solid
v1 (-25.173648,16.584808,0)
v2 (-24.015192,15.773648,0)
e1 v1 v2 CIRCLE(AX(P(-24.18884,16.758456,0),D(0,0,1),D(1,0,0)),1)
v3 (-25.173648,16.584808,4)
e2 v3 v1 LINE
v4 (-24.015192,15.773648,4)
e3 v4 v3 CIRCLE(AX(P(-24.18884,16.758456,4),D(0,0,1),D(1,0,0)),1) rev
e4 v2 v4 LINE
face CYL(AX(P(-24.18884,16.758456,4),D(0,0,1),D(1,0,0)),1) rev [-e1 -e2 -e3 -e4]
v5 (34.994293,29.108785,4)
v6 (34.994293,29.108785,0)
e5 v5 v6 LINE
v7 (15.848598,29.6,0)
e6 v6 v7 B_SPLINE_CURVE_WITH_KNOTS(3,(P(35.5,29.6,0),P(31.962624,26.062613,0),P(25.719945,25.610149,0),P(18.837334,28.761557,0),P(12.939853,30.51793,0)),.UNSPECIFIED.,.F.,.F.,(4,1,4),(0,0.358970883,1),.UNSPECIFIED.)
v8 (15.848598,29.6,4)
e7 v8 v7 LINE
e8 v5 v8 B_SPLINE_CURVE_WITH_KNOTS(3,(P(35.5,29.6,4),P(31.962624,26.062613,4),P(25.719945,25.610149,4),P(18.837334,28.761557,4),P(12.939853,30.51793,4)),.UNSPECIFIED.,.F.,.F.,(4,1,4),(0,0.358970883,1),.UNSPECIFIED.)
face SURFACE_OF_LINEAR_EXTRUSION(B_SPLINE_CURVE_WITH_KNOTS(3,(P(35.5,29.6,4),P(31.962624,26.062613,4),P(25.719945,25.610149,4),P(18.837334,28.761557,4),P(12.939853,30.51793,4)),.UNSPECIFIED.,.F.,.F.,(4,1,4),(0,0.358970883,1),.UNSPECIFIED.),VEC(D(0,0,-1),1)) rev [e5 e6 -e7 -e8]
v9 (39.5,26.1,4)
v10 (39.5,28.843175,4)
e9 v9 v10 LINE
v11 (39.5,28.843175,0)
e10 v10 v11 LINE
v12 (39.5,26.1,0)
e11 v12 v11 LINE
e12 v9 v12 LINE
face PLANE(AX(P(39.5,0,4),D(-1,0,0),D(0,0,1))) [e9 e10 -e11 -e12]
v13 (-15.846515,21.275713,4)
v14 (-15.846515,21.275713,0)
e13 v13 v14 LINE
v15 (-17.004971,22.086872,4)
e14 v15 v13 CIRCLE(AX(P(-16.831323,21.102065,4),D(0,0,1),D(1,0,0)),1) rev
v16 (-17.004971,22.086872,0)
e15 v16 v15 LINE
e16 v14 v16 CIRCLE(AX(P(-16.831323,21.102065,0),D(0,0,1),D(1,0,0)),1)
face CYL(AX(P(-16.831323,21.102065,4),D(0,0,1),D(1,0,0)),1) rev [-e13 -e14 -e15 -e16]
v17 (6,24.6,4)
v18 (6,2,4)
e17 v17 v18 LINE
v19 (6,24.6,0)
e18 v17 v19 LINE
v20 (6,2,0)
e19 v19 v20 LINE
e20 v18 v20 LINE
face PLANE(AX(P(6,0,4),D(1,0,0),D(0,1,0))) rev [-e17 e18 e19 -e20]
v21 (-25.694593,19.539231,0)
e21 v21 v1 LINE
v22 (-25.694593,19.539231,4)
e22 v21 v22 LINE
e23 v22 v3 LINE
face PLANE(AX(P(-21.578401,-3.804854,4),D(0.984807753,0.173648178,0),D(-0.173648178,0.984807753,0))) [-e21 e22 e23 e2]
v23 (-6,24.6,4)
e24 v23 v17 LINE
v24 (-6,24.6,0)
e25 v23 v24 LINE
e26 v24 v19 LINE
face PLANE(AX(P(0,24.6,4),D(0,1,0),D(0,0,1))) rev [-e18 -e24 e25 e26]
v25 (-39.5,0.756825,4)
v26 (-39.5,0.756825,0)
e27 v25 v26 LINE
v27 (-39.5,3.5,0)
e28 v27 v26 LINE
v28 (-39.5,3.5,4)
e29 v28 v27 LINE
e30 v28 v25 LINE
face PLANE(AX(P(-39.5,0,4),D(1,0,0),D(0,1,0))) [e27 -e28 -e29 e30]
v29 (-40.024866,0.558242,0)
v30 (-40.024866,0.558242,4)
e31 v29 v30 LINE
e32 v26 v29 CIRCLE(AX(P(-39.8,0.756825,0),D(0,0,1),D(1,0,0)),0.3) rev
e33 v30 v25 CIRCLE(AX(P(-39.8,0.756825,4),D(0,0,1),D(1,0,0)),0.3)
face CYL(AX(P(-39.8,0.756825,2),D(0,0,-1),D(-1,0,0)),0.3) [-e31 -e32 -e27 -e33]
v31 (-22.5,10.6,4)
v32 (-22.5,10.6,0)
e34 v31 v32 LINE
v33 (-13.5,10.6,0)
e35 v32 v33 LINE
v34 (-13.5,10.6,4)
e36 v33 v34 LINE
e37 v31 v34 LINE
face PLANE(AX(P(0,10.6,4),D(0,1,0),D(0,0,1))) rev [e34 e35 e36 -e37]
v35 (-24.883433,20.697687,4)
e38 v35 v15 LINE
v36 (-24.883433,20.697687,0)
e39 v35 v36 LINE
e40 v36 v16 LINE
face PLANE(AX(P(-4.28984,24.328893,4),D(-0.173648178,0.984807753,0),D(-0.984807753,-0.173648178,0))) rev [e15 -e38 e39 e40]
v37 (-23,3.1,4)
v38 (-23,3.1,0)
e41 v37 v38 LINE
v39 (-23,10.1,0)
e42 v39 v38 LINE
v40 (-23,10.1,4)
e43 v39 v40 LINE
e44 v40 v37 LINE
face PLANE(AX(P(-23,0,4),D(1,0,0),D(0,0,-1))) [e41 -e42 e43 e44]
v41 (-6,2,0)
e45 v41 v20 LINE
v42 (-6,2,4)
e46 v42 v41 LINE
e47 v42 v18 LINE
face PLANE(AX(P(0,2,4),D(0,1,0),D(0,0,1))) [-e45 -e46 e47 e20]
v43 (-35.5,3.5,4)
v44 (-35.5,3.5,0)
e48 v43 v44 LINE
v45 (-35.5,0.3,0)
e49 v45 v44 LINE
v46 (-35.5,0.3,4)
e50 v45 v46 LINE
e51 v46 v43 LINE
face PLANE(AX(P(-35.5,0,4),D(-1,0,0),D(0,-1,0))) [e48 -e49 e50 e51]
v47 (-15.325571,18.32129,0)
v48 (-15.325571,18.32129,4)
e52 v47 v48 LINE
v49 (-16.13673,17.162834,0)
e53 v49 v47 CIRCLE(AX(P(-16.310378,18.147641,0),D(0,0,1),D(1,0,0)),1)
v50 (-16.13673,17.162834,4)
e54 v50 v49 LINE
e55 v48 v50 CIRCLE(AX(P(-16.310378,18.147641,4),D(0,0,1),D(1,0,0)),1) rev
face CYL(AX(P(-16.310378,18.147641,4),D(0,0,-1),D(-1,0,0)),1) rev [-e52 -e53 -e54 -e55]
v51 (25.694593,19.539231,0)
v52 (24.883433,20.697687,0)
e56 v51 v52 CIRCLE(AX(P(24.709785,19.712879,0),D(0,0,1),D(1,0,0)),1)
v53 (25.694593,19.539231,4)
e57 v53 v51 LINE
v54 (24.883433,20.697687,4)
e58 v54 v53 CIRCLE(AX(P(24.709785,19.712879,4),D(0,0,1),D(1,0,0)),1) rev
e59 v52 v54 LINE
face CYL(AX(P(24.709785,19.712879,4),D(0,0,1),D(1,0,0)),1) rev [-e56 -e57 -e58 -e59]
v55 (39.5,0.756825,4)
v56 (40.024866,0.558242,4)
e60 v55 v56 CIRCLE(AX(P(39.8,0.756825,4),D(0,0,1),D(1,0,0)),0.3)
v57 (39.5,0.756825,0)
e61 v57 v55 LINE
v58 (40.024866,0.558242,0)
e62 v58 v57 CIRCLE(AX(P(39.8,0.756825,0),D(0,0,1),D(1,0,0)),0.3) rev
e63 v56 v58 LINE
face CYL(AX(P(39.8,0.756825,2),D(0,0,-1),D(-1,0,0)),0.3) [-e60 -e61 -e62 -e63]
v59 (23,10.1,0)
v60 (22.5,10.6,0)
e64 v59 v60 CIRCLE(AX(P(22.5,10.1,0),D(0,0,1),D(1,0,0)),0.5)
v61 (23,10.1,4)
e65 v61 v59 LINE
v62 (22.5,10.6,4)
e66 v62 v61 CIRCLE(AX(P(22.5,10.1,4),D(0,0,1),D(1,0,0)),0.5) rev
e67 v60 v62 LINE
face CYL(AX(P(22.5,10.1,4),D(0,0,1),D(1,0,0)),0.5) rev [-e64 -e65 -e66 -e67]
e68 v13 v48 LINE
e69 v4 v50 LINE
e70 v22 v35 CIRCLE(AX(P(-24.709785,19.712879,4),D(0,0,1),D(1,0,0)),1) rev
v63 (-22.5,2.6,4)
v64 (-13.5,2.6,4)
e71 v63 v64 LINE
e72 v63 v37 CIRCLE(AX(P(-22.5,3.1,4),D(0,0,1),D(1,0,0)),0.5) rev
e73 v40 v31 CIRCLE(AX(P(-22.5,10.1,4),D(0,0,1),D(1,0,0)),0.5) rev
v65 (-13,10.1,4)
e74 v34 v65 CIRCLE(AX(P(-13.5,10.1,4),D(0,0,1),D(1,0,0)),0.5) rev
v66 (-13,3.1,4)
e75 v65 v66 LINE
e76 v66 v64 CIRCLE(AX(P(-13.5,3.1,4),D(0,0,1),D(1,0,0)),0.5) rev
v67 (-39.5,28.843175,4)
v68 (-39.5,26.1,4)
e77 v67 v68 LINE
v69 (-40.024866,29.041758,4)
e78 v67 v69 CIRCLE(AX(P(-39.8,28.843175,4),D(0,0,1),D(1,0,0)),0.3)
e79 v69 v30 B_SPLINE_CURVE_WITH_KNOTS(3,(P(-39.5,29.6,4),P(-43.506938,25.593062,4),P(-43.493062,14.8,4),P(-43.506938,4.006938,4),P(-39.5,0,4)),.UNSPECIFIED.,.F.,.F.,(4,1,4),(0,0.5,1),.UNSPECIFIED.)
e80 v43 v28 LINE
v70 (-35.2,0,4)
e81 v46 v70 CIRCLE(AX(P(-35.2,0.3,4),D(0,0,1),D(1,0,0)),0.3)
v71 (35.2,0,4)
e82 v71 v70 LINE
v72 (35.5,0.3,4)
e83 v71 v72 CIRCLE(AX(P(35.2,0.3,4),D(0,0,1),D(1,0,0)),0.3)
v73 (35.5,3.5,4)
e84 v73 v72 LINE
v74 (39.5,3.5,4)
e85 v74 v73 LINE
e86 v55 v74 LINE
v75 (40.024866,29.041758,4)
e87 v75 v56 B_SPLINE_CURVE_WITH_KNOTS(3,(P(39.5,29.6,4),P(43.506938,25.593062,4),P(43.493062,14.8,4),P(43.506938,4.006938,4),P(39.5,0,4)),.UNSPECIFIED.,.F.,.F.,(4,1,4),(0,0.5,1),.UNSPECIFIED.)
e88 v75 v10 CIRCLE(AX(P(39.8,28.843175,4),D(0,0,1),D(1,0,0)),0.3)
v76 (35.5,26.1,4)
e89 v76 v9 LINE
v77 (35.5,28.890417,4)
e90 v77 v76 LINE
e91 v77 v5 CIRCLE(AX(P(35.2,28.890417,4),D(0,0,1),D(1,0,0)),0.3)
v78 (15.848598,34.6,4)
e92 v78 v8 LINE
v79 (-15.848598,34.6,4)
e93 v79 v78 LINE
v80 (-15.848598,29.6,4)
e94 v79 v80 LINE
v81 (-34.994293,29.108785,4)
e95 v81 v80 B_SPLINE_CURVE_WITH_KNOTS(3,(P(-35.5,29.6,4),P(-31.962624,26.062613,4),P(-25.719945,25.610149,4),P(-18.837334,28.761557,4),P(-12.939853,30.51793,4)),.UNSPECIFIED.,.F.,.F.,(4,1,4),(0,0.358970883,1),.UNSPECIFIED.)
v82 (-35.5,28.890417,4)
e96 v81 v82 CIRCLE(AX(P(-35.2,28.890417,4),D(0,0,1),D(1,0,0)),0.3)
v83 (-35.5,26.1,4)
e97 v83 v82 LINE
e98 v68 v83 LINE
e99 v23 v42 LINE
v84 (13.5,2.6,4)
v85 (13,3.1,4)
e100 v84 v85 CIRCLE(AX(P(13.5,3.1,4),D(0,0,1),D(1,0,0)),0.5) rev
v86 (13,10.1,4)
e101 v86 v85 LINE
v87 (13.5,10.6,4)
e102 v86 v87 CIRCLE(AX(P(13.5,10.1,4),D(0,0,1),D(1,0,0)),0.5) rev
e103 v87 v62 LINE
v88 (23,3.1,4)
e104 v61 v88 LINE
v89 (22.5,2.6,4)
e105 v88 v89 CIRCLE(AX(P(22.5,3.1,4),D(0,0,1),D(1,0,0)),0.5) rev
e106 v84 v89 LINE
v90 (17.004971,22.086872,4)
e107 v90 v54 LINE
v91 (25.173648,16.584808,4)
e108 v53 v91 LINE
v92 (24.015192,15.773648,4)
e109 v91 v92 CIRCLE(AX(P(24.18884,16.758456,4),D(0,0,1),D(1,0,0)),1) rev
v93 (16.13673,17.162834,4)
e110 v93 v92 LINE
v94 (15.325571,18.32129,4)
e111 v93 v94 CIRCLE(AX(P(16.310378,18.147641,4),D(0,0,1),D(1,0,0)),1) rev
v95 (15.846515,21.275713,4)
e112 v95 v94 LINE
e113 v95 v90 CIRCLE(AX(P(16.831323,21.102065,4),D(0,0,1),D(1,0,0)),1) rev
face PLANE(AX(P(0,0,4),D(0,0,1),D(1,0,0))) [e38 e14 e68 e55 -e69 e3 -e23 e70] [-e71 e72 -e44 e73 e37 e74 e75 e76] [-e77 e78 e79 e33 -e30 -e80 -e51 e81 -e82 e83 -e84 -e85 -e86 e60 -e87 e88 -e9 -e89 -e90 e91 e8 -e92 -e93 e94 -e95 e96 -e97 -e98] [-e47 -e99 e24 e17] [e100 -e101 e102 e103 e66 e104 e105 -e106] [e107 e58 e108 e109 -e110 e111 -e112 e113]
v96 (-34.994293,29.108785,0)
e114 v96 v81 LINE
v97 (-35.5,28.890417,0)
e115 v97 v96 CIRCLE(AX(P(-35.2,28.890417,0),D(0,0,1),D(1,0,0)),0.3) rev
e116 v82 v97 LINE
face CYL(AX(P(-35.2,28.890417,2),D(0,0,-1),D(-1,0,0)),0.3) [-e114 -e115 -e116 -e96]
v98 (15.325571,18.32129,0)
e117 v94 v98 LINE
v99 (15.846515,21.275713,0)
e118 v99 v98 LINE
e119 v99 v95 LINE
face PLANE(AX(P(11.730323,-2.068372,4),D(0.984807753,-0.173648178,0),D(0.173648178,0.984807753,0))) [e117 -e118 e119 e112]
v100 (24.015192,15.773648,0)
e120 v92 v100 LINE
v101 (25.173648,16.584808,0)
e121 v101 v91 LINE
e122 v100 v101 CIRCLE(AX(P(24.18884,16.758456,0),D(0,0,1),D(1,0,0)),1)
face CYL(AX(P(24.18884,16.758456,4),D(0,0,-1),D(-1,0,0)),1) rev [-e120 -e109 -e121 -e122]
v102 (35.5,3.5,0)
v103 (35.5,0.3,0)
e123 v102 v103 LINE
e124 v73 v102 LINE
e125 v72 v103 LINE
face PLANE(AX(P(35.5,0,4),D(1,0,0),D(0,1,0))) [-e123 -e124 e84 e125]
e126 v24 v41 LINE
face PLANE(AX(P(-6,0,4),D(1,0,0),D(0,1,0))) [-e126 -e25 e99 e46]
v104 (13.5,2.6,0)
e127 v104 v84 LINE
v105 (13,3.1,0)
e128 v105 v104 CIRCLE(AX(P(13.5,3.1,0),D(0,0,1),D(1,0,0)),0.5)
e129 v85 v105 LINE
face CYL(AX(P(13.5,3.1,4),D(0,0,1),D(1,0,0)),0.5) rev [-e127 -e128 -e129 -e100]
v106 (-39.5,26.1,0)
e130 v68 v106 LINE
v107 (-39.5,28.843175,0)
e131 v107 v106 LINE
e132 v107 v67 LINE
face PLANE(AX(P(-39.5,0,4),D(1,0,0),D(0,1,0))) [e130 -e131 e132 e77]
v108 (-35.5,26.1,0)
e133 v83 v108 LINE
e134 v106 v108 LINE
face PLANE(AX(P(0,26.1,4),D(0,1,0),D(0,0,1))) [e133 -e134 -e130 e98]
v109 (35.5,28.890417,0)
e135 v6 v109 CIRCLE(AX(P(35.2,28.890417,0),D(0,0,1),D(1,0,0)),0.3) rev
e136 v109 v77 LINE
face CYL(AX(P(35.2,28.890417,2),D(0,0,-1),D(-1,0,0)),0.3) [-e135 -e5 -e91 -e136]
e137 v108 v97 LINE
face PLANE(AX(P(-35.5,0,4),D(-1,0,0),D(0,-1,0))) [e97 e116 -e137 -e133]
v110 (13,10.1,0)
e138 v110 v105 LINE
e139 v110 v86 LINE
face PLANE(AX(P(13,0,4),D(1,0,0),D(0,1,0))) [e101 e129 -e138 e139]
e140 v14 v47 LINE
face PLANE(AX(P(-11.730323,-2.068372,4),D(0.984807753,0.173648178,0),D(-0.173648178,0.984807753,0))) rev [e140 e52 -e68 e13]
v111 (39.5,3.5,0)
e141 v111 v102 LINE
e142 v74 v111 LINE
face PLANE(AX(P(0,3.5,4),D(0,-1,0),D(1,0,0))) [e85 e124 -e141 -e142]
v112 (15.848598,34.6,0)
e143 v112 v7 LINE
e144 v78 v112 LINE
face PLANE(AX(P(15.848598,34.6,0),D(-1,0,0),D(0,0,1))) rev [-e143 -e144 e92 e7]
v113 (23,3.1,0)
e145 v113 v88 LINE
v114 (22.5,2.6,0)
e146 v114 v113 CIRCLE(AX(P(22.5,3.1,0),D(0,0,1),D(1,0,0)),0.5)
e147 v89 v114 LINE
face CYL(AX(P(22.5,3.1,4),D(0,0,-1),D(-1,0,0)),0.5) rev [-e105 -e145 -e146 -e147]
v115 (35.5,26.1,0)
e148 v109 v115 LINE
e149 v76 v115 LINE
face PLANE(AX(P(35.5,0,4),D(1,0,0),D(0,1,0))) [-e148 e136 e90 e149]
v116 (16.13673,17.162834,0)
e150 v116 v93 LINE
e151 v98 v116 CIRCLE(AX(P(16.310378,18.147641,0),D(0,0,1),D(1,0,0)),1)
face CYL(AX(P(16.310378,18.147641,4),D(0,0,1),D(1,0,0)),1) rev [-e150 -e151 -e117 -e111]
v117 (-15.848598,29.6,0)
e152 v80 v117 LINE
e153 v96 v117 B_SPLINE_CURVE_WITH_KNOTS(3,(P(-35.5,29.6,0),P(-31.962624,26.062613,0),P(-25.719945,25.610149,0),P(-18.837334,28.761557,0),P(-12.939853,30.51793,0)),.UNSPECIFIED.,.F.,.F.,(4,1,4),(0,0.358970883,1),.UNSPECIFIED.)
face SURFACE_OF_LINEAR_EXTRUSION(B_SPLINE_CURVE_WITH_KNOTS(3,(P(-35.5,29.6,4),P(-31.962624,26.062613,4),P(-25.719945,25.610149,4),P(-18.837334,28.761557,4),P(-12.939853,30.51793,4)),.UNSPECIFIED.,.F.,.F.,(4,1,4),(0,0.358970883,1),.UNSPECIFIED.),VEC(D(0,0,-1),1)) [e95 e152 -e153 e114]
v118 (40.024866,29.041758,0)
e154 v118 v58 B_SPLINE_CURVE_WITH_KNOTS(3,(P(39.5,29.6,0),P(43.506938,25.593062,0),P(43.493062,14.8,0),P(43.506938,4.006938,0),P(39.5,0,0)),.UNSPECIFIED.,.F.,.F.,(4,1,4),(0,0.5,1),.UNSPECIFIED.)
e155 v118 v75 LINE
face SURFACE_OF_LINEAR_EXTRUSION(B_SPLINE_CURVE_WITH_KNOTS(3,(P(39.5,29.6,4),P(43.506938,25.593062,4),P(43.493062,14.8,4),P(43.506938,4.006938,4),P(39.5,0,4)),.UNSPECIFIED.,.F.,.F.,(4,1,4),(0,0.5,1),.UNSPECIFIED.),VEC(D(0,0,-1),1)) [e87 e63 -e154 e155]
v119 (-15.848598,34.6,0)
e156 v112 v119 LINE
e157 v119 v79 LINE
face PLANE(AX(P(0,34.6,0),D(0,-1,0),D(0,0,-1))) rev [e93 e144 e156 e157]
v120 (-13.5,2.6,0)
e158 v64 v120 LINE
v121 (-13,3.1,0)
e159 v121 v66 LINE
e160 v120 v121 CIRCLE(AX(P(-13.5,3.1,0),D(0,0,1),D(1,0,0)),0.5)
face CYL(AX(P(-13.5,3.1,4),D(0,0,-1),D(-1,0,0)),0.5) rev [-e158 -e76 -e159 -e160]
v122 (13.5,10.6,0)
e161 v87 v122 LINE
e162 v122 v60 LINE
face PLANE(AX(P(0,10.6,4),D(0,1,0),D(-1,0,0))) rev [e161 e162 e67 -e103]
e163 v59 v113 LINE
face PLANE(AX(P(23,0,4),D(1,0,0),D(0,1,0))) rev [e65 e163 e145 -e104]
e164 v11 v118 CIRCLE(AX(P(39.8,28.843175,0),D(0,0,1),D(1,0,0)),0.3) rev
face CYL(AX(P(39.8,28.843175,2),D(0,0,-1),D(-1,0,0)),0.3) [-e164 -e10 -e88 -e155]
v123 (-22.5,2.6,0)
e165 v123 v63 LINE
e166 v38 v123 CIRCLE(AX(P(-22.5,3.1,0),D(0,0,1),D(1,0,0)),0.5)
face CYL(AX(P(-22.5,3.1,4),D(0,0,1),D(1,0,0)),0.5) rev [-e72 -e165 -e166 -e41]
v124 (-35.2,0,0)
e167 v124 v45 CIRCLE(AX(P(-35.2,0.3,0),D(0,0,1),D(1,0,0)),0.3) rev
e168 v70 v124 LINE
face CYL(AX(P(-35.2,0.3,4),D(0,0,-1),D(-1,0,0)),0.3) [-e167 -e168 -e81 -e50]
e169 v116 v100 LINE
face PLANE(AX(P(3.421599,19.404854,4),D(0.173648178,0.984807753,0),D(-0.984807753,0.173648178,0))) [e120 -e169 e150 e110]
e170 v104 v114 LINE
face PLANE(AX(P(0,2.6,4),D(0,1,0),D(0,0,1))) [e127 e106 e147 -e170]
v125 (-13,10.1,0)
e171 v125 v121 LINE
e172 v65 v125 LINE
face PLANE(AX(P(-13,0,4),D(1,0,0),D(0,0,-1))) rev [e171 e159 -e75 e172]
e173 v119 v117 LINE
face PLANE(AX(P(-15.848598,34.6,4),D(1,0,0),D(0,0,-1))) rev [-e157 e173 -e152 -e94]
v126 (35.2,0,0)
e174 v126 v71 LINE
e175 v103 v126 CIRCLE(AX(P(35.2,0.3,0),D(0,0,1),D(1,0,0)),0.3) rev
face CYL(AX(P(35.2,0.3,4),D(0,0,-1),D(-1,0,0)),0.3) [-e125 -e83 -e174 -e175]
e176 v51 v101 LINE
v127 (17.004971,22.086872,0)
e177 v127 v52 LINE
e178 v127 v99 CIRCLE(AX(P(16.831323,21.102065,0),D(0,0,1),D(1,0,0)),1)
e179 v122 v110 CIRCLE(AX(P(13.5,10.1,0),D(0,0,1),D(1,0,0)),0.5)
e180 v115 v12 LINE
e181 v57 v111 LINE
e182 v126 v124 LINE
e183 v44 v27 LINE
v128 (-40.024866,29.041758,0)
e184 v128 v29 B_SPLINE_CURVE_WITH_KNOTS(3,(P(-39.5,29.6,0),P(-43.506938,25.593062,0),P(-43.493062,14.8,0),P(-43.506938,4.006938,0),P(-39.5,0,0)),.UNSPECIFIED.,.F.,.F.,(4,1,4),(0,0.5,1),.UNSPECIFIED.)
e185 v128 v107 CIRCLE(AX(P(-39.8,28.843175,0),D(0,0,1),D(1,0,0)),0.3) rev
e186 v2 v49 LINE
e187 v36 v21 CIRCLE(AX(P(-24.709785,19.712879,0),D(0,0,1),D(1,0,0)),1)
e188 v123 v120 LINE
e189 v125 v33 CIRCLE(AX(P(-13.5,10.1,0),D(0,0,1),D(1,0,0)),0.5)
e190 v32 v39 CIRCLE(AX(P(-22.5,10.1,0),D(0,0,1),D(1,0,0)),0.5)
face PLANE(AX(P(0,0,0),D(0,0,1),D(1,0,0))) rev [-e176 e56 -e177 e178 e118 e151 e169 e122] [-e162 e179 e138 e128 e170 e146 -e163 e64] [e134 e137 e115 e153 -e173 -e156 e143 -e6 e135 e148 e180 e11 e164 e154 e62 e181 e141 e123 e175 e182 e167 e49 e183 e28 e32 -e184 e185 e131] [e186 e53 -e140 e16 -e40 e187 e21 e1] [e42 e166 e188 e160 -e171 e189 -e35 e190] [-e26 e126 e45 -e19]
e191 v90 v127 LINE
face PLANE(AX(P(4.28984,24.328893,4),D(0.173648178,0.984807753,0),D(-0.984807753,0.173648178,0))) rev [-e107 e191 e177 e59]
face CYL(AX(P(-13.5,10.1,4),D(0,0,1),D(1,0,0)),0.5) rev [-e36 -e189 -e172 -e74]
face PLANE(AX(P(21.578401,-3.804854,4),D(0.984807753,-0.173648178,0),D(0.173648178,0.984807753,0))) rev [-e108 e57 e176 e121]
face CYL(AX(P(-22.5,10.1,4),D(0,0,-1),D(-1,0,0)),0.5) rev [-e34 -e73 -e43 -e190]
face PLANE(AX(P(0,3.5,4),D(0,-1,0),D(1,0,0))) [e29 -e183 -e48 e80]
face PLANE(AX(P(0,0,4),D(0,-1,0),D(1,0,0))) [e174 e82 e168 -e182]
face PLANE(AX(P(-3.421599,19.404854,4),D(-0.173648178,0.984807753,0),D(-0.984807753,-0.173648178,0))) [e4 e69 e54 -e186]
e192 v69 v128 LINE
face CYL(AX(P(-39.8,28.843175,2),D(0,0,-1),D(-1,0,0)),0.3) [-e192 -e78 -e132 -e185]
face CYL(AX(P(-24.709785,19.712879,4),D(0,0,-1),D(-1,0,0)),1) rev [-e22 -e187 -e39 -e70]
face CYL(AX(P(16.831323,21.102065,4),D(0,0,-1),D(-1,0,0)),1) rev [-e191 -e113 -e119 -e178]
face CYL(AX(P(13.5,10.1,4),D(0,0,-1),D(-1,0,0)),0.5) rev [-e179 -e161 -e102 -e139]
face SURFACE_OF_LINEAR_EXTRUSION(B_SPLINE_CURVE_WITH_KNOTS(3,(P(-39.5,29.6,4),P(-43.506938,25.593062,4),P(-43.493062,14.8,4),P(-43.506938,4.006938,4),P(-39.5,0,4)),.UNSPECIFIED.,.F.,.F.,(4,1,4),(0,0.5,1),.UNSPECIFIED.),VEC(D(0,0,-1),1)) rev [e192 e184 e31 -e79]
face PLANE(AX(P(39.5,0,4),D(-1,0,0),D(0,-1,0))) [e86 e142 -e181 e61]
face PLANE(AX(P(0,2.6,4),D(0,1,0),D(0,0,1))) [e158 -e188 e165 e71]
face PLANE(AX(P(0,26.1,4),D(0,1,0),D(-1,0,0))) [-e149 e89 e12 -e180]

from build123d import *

# Parameters (mm, degrees)
ESTRUSIONE_ESTRUSIONE1_OUTLINE_W   = 10
ESTRUSIONE_ESTRUSIONE1_OUTLINE_H   = 8
ESTRUSIONE_ESTRUSIONE1_OUTLINE_W_2 = 12
ESTRUSIONE_ESTRUSIONE1_OUTLINE_H_2 = 22.6
ESTRUSIONE_ESTRUSIONE1_DEPTH       = 4
RACCORDO1_R                        = 1
RACCORDO3_R                        = 0.5
RACCORDO4_R                        = 0.3
SCHIZZO3_W                         = 31.69719665
SCHIZZO3_H                         = 4
ESTRUSIONE_ESTRUSIONE2_DEPTH       = 5


# Read off the part's stored shape, not the designer's step: Estrusione-Estrusione1
with BuildPart() as part:
    # Estrusione-Estrusione1 outline → Estrusione-Estrusione1 (new body)
    with BuildSketch(Plane.XY):
        with BuildLine():
            Line((-35.5, 26.1), (-39.5, 26.1))
            Line((-39.5, 26.1), (-39.5, 29.6))
            add(Edge.make_bspline(
                [(-39.5, 29.6), (-43.506938427, 25.593061573), (-43.493061573, 14.8), (-43.506938427, 4.006938427), (-39.5, 0)],
                knots=[0, 0, 0, 0, 0.5, 1, 1, 1, 1], degree=3))
            Line((-39.5, 0), (-39.5, 3.5))
            Line((-39.5, 3.5), (-35.5, 3.5))
            Line((-35.5, 3.5), (-35.5, 0))
            Line((-35.5, 0), (35.5, 0))
            Line((35.5, 0), (35.5, 3.5))
            Line((35.5, 3.5), (39.5, 3.5))
            Line((39.5, 3.5), (39.5, 0))
            add(Edge.make_bspline(
                [(39.5, 29.6), (43.506938427, 25.593061573), (43.493061573, 14.8), (43.506938427, 4.006938427), (39.5, 0)],
                knots=[0, 0, 0, 0, 0.5, 1, 1, 1, 1], degree=3))
            Line((39.5, 29.6), (39.5, 26.1))
            Line((39.5, 26.1), (35.5, 26.1))
            Line((35.5, 26.1), (35.5, 29.6))
            add(Edge.make_bspline(
                [(35.5, 29.6), (31.962623794, 26.062612753), (26.4060962, 25.659880805), (20.342579531, 28.112334068), (15.848598331, 29.600000017)],
                knots=[0, 0, 0, 0, 0.358970883, 0.890087037, 0.890087037, 0.890087037, 0.890087037], degree=3))
            Line((15.848598331, 29.600000017), (-15.848598331, 29.600000017))
            add(Edge.make_bspline(
                [(-35.5, 29.6), (-31.962623794, 26.062612753), (-26.4060962, 25.659880805), (-20.342579531, 28.112334068), (-15.848598331, 29.600000017)],
                knots=[0, 0, 0, 0, 0.358970883, 0.890087037, 0.890087037, 0.890087037, 0.890087037], degree=3))
            Line((-35.5, 29.6), (-35.5, 26.1))
        make_face()
        with Locations((-18, 6.6)):
            Rectangle(ESTRUSIONE_ESTRUSIONE1_OUTLINE_W, ESTRUSIONE_ESTRUSIONE1_OUTLINE_H, mode=Mode.SUBTRACT)
        with Locations((18, 6.6)):
            Rectangle(ESTRUSIONE_ESTRUSIONE1_OUTLINE_W, ESTRUSIONE_ESTRUSIONE1_OUTLINE_H, mode=Mode.SUBTRACT)
        with Locations((0, 13.3)):
            Rectangle(ESTRUSIONE_ESTRUSIONE1_OUTLINE_W_2, ESTRUSIONE_ESTRUSIONE1_OUTLINE_H_2, mode=Mode.SUBTRACT)
        Polygon((-25.868240888, 20.524038765), (-16.020163358, 22.260520542), (-15.15192247, 17.336481777), (-25, 15.6), align=None, mode=Mode.SUBTRACT)
        Polygon((16.020163358, 22.260520542), (25.868240888, 20.524038765), (25, 15.6), (15.15192247, 17.336481777), align=None, mode=Mode.SUBTRACT)
    extrude(amount=ESTRUSIONE_ESTRUSIONE1_DEPTH)

    # Raccordo1
    raccordo1_edges = [part.edges().sort_by_distance(p)[0] for p in [
        (16.020163358, 22.260520542, 2),
        (15.15192247, 17.336481777, 2),
        (25, 15.6, 2),
        (25.868240888, 20.524038765, 2),
        (-25.868240888, 20.524038765, 2),
        (-25, 15.6, 2),
        (-15.15192247, 17.336481777, 2),
        (-16.020163358, 22.260520542, 2),
    ]]
    fillet(raccordo1_edges, radius=RACCORDO1_R)

    # Raccordo3
    raccordo3_edges = [part.edges().sort_by_distance(p)[0] for p in [
        (13, 10.6, 2),
        (13, 2.6, 2),
        (23, 2.6, 2),
        (23, 10.6, 2),
        (-23, 10.6, 2),
        (-23, 2.6, 2),
        (-13, 2.6, 2),
        (-13, 10.6, 2),
    ]]
    fillet(raccordo3_edges, radius=RACCORDO3_R)

    # Raccordo4
    raccordo4_edges = [part.edges().sort_by_distance(p)[0] for p in [
        (-39.5, 0, 2),
        (39.5, 0, 2),
        (39.5, 29.6, 2),
        (35.5, 29.6, 2),
        (-39.5, 29.6, 2),
        (-35.5, 29.6, 2),
        (35.5, 0, 2),
        (-35.5, 0, 2),
    ]]
    fillet(raccordo4_edges, radius=RACCORDO4_R)

    # Schizzo3 → Estrusione-Estrusione2 (add)
    with BuildSketch(Plane(origin=(0, 29.6, 0), x_dir=(1, 0, 0), z_dir=(0, 1, 0))):
        with Locations((0, -2)):
            Rectangle(SCHIZZO3_W, SCHIZZO3_H)
    extrude(amount=ESTRUSIONE_ESTRUSIONE2_DEPTH)


solid = part.part
